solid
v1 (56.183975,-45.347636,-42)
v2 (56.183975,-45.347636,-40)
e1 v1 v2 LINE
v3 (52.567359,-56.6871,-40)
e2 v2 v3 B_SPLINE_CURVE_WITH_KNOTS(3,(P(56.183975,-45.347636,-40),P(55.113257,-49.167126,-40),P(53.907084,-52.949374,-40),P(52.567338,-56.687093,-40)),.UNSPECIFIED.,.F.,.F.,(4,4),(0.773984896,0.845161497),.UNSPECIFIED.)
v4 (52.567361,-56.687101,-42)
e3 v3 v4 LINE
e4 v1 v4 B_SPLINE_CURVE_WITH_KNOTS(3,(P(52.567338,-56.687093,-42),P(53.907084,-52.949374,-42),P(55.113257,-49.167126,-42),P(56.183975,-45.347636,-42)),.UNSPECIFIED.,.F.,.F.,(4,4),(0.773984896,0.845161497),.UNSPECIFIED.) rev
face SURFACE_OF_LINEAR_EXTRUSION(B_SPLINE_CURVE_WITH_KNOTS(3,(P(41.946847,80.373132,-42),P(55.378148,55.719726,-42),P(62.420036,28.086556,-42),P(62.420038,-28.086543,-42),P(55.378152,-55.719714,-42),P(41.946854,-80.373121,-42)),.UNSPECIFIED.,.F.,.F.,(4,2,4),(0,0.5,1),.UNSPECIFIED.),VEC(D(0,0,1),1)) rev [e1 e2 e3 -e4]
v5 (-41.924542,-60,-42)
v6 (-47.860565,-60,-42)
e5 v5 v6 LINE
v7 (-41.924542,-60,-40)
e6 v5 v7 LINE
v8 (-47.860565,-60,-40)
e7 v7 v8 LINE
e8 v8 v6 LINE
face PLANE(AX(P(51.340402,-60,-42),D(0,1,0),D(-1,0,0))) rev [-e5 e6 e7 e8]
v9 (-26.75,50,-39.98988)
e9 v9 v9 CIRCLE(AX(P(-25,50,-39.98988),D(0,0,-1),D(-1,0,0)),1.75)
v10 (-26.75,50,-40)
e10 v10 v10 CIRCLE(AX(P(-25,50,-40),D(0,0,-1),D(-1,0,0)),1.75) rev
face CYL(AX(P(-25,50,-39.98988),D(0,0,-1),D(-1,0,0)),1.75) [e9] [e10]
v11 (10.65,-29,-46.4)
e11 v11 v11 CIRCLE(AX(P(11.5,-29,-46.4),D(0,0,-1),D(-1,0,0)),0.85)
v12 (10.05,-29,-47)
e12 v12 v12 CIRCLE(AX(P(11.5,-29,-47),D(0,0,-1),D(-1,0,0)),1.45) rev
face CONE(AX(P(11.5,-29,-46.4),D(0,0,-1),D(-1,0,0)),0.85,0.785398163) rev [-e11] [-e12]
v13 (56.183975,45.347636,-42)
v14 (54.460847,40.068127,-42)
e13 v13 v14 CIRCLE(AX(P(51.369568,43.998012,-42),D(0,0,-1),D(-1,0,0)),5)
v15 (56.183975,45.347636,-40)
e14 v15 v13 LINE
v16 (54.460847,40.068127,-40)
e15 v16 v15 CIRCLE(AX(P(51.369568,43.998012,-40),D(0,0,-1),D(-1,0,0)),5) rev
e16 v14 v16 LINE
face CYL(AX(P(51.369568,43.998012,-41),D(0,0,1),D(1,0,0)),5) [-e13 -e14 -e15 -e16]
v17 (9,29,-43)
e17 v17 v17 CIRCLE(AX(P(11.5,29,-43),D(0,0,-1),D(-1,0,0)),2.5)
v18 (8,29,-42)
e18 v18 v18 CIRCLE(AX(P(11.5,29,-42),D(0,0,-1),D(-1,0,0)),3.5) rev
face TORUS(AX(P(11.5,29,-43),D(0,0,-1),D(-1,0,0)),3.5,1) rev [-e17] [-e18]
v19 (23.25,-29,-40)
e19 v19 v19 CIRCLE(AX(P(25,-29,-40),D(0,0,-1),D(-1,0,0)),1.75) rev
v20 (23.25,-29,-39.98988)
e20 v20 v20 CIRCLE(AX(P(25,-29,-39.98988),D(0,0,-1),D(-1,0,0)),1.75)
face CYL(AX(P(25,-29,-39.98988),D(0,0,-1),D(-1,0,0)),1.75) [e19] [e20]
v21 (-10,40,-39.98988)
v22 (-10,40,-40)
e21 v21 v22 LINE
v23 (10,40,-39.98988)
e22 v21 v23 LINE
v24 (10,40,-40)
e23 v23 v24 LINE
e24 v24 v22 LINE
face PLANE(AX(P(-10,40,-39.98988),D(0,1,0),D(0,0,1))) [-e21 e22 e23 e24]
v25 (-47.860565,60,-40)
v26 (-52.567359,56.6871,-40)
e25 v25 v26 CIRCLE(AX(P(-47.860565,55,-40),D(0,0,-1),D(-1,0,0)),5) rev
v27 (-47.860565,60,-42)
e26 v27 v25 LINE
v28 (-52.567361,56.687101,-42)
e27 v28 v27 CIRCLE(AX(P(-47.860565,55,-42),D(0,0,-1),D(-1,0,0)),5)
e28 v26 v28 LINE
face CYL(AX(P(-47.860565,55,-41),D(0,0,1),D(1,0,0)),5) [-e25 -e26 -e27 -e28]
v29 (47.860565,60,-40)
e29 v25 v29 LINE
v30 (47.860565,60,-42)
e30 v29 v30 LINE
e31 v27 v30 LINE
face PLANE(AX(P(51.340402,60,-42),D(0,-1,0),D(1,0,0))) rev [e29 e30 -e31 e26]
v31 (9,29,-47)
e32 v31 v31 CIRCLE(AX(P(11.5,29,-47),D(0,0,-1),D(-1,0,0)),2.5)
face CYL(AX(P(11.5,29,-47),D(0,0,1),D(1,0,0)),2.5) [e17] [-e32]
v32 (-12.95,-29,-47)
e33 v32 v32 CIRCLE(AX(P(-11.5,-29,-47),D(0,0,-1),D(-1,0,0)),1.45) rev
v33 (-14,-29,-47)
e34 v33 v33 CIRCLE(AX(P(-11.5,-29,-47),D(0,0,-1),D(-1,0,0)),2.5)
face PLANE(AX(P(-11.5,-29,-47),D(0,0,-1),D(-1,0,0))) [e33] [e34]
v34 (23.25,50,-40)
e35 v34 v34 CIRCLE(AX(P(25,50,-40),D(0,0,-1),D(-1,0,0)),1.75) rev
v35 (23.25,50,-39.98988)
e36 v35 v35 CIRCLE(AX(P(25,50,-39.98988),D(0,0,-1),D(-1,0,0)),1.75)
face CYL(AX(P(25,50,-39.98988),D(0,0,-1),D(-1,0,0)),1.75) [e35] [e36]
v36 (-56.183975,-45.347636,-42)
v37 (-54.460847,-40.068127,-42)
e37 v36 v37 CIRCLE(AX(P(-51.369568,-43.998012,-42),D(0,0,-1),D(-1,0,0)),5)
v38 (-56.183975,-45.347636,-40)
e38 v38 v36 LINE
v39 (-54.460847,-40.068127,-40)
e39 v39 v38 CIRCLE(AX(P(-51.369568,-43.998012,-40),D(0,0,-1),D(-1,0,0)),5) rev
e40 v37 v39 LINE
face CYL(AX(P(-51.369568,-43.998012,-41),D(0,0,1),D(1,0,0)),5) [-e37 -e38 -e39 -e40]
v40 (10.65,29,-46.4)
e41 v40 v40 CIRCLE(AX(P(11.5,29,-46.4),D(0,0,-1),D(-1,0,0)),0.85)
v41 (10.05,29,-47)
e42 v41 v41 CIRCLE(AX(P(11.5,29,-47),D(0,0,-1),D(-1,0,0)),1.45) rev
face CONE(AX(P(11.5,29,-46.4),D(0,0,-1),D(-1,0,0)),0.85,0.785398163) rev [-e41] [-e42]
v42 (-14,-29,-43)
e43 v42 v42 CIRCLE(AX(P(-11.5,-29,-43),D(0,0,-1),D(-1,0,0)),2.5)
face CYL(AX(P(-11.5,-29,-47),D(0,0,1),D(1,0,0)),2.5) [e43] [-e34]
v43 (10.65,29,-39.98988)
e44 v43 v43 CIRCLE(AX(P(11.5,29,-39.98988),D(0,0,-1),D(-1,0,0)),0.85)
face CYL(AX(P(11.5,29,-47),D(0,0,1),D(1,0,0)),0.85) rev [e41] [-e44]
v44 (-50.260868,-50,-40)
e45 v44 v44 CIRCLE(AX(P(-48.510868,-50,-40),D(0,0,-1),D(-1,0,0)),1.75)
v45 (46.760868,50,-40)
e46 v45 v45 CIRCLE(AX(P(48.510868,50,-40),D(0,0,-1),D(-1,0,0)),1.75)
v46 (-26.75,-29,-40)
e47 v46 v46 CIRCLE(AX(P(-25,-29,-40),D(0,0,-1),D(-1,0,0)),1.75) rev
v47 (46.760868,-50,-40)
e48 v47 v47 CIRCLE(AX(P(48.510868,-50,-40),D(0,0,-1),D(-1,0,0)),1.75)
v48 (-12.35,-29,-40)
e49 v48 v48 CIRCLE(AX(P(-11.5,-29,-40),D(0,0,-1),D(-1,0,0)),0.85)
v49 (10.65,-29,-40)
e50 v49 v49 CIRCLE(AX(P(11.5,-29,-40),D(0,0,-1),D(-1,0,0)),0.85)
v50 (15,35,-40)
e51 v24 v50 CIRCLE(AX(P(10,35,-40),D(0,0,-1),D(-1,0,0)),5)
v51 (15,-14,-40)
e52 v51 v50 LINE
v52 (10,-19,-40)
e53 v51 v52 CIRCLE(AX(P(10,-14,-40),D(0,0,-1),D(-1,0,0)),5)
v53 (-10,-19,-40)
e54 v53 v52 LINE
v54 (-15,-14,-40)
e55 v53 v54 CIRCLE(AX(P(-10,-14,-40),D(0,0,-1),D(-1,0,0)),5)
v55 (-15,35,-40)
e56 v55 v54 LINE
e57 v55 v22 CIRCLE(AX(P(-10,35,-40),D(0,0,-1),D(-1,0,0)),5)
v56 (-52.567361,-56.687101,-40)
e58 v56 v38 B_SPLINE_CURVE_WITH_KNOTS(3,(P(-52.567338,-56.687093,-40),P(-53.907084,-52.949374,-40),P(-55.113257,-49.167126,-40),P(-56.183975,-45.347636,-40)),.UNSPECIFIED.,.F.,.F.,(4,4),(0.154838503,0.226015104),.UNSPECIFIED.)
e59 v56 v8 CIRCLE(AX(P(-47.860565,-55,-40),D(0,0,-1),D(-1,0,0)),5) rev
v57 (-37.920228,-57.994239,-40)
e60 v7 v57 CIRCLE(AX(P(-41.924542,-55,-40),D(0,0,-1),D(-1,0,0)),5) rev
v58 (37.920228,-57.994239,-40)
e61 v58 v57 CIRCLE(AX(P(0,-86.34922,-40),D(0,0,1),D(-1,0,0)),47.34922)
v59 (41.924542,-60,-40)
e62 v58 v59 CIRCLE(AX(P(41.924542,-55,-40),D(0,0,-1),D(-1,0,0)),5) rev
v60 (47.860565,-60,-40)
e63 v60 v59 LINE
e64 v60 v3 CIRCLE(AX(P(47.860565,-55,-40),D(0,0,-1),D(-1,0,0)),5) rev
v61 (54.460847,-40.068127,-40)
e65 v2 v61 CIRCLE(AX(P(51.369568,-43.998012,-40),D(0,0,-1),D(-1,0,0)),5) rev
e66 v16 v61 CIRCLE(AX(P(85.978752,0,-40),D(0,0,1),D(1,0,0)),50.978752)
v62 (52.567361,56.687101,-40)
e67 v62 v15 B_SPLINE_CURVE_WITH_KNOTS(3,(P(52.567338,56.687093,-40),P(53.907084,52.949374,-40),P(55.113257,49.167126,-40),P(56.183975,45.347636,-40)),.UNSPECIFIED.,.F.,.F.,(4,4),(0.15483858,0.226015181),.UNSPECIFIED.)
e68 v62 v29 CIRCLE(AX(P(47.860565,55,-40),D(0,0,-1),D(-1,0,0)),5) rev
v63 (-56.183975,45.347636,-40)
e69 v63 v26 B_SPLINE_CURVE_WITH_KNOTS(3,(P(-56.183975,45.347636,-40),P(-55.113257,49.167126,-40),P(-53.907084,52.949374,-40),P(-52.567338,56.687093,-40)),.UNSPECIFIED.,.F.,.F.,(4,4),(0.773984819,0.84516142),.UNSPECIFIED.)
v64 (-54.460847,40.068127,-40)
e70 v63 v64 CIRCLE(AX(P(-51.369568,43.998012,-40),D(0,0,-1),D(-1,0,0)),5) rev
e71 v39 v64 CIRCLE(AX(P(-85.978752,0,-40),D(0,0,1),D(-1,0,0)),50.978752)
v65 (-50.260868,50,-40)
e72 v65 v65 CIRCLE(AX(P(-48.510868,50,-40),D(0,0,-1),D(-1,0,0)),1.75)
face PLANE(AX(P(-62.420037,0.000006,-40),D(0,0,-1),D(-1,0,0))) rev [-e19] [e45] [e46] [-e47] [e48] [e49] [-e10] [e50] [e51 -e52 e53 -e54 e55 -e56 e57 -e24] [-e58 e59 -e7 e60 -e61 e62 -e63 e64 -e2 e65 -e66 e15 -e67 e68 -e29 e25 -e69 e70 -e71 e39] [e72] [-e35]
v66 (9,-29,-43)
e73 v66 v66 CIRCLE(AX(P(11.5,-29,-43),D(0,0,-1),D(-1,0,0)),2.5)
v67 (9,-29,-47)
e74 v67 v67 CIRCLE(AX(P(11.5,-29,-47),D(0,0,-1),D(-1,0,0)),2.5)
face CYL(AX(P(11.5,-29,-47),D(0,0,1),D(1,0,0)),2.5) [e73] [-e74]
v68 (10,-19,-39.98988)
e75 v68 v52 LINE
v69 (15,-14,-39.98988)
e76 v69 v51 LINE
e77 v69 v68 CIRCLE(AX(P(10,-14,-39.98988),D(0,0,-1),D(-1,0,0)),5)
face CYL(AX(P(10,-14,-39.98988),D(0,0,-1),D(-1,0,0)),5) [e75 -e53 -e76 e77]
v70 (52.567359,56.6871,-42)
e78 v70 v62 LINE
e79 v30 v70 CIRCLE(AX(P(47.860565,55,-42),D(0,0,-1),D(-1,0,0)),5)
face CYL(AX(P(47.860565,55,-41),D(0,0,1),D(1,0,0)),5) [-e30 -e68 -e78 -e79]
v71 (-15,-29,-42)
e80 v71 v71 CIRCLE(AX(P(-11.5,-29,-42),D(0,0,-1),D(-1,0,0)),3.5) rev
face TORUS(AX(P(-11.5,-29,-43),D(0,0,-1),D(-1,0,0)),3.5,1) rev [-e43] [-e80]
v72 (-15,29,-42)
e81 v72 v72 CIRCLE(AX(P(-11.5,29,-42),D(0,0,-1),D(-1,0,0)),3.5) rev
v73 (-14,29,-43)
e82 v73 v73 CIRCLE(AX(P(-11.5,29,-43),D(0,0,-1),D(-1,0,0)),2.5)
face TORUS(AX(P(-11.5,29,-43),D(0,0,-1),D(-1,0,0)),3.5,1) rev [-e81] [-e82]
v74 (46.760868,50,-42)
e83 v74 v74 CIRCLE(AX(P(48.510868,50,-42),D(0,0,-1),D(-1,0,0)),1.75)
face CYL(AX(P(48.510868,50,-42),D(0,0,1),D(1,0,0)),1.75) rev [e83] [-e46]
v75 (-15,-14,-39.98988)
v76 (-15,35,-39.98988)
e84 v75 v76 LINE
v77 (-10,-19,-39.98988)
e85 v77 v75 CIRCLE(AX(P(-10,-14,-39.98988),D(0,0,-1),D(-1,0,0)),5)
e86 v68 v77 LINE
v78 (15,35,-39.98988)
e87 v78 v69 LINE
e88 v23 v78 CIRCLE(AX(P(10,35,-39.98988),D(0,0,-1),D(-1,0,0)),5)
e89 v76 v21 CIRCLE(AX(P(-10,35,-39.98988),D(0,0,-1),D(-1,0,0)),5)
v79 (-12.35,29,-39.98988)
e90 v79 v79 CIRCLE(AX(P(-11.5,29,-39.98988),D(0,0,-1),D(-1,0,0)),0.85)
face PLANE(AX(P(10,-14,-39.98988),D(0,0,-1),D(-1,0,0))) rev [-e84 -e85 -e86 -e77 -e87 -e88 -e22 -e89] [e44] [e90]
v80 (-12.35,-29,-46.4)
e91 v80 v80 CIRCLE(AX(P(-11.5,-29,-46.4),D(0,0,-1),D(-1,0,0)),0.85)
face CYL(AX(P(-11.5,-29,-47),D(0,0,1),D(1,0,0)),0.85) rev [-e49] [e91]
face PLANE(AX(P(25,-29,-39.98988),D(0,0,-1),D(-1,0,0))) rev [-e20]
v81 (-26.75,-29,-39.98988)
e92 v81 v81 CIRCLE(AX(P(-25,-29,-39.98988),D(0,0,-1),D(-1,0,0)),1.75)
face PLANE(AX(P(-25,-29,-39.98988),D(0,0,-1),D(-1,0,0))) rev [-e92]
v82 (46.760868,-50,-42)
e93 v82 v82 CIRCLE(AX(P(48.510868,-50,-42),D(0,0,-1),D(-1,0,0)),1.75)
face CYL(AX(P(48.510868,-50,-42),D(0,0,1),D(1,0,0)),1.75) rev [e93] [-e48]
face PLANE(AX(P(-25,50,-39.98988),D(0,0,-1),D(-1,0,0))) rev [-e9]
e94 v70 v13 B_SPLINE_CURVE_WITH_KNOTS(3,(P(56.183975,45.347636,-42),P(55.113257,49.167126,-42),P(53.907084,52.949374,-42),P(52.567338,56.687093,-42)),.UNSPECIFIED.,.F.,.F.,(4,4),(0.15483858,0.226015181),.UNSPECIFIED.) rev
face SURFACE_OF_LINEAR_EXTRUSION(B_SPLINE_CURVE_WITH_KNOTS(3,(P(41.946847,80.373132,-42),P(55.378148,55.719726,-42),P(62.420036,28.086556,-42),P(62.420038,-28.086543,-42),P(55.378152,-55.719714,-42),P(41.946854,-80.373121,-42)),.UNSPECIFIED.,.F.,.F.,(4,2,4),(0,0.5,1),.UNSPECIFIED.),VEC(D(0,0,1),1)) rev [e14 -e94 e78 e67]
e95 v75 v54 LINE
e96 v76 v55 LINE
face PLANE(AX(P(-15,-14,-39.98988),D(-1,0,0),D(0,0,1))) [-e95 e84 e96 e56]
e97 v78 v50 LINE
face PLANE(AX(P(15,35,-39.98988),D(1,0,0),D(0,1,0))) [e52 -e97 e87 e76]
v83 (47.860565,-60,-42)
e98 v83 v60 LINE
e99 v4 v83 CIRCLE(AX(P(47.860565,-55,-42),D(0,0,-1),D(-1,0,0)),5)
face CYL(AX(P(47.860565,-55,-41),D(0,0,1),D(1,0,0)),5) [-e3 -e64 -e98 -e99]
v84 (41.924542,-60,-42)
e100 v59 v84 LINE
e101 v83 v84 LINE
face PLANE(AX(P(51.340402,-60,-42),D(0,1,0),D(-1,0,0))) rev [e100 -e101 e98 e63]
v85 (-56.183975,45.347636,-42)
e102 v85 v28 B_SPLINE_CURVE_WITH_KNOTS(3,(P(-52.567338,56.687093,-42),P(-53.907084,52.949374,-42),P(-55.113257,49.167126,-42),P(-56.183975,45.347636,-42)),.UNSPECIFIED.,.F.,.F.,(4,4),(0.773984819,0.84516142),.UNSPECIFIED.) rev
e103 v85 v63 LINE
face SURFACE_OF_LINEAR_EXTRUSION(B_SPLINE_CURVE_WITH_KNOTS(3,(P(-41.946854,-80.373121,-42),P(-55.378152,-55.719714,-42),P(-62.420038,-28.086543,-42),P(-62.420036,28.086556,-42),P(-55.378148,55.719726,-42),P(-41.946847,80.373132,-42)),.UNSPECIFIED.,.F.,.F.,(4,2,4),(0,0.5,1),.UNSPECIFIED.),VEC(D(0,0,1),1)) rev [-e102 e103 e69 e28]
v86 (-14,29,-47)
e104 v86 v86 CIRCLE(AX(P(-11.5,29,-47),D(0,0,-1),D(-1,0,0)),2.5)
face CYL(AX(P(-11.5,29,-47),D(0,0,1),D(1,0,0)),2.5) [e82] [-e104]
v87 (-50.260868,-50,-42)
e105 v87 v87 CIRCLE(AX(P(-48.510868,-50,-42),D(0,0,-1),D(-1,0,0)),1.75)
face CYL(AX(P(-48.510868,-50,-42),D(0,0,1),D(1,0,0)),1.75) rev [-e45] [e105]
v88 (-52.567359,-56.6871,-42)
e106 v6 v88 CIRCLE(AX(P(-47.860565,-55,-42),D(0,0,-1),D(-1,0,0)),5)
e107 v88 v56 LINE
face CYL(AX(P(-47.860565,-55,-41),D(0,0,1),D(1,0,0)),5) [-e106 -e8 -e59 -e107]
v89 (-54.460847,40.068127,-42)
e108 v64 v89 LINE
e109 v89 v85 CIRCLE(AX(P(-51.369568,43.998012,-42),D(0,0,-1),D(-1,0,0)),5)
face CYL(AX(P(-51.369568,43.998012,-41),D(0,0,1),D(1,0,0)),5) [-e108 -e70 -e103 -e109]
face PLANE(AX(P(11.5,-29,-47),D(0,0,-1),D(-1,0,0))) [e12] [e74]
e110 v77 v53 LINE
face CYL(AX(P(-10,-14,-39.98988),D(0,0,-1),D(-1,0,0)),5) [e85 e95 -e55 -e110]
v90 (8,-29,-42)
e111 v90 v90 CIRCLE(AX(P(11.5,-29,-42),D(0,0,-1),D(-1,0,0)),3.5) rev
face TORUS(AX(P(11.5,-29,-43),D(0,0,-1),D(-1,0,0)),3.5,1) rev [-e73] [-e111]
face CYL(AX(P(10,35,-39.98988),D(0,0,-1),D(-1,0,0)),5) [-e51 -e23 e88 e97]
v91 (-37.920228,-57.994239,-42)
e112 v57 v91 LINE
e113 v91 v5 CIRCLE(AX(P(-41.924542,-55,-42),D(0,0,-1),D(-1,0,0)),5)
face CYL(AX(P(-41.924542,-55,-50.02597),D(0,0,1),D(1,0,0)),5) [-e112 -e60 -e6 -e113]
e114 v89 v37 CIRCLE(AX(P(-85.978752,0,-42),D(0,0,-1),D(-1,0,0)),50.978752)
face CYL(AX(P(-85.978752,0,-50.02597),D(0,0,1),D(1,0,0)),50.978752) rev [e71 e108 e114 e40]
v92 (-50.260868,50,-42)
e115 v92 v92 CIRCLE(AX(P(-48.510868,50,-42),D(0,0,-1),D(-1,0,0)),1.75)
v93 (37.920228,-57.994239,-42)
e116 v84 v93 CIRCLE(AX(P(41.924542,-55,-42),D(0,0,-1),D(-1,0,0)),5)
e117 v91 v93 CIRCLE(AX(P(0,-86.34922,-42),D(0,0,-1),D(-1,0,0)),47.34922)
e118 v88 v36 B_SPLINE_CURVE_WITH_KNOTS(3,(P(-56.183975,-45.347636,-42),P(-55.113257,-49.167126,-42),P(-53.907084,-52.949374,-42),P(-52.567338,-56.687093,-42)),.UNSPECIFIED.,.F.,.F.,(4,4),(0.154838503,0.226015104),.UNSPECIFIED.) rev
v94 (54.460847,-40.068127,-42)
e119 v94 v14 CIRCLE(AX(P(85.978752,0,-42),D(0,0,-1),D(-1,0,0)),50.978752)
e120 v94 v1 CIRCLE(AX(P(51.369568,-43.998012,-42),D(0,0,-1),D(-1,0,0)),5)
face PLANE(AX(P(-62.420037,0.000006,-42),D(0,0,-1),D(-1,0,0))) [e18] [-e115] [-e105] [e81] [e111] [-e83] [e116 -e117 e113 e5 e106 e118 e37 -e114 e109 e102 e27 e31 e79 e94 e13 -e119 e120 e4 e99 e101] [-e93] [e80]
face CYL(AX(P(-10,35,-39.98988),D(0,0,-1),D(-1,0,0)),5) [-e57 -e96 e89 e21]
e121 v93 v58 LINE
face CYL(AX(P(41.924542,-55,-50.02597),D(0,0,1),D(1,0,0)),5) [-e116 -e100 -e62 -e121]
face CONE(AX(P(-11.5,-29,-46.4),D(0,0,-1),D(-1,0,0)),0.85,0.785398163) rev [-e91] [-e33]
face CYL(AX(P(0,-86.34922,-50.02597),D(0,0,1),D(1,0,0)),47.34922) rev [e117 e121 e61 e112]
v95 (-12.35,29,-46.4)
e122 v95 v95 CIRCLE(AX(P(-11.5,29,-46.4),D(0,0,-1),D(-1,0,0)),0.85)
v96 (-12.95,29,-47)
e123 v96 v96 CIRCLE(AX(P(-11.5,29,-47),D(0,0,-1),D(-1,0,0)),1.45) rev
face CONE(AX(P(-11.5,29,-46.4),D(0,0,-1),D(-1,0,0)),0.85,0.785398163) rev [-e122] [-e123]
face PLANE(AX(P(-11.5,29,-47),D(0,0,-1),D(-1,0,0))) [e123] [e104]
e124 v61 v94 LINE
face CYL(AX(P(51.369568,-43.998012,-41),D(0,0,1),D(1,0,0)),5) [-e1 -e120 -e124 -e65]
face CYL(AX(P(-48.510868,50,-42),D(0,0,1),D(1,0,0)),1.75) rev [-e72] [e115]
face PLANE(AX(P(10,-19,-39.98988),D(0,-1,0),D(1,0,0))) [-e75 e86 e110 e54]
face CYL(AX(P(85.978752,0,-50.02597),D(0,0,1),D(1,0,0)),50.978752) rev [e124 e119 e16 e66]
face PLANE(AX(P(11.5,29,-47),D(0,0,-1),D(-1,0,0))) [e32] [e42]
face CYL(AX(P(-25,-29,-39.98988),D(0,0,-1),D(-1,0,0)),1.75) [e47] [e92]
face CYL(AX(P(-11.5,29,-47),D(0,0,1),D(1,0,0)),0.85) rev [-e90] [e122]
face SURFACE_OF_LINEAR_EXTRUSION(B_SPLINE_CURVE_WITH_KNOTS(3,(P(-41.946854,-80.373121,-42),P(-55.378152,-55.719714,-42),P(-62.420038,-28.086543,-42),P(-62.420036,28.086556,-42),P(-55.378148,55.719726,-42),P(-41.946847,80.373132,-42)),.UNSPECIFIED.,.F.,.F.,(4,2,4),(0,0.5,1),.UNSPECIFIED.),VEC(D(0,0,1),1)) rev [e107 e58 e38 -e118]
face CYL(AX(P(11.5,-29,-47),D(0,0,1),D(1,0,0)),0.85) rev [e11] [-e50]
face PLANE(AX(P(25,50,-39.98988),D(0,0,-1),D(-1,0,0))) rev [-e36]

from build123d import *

# Parameters (mm, degrees)
IMPORTED_START                     = -42
IMPORTED_BODY_1_OUTLINE_R          = 1.75
IMPORTED_BODY_1_DEPTH              = 2
EXTRUDE_START                      = -2.01012
SKETCH_1_R                         = 1.75
EXTRUDE_1_DEPTH                    = 2.01012
SKETCH_2_R                         = 2.5
SKETCH_2_R_2                       = 0.85
EXTRUDE_2_DEPTH                    = 5
FILLET_1_R                         = 1
CHAMFER_1_SIZE                     = 0.6
SKETCH_3_R                         = 0.85
CUT_EXTRUDE_1_DEPTH                = 83.477440833
PATTERN_LINEAR_1_COUNT             = 2
PATTERN_LINEAR_1_PITCH             = 58
PATTERN_LINEAR_1_COUNT_DIR2        = 2
PATTERN_LINEAR_1_PITCH_DIR2        = 23
FILLET_1_OF_PATTERN_LINEAR_1_R     = 1
CHAMFER_1_OF_PATTERN_LINEAR_1_SIZE = 0.6


# Read off the part's stored shape, not the designer's step: Заготовка-Основание-1
with BuildPart() as part:
    # Заготовка-Основание-1 outline → Заготовка-Основание-1 (new body)
    with BuildSketch(Plane.XY.offset(IMPORTED_START)):
        with BuildLine():
            add(Edge.make_bspline(
                [(-52.567338158, -56.687092755), (-53.907083637, -52.949373723), (-55.113256729, -49.167125614), (-56.183975236, -45.347636311)],
                knots=[0.154838503, 0.154838503, 0.154838503, 0.154838503, 0.226015104, 0.226015104, 0.226015104, 0.226015104], degree=3))
            ThreePointArc((-52.567338158, -56.687092755), (-50.738457524, -59.088732308), (-47.860564525, -60))
            Line((-47.860564525, -60), (-41.924542191, -60))
            ThreePointArc((-41.924542191, -60), (-39.685256286, -59.470525543), (-37.920228255, -57.994239454))
            ThreePointArc((-37.920228255, -57.994239454), (0, -39), (37.920228255, -57.994239454))
            ThreePointArc((37.920228255, -57.994239454), (39.685256286, -59.470525543), (41.924542191, -60))
            Line((41.924542191, -60), (47.860564525, -60))
            ThreePointArc((47.860564525, -60), (50.738457524, -59.088732308), (52.567338158, -56.687092755))
            add(Edge.make_bspline(
                [(56.183975236, -45.347636311), (55.113256729, -49.167125614), (53.907083637, -52.949373723), (52.567338158, -56.687092755)],
                knots=[0.773984896, 0.773984896, 0.773984896, 0.773984896, 0.845161497, 0.845161497, 0.845161497, 0.845161497], degree=3))
            ThreePointArc((56.183975236, -45.347636311), (56.122806116, -42.446648473), (54.460846844, -40.068127194))
            ThreePointArc((54.460846844, -40.068127194), (35, 6e-09), (54.460846854, 40.068127202))
            ThreePointArc((54.460846854, 40.068127202), (56.122806127, 42.446648481), (56.183975247, 45.34763632))
            add(Edge.make_bspline(
                [(52.567338167, 56.687092757), (53.907083647, 52.949373727), (55.113256739, 49.167125621), (56.183975247, 45.34763632)],
                knots=[0.15483858, 0.15483858, 0.15483858, 0.15483858, 0.226015181, 0.226015181, 0.226015181, 0.226015181], degree=3))
            ThreePointArc((52.567338167, 56.687092757), (50.738457533, 59.088732309), (47.860564535, 60))
            Line((47.860564535, 60), (-47.860564535, 60))
            ThreePointArc((-47.860564535, 60), (-50.738457533, 59.088732309), (-52.567338167, 56.687092757))
            add(Edge.make_bspline(
                [(-56.183975247, 45.34763632), (-55.113256739, 49.167125621), (-53.907083647, 52.949373727), (-52.567338167, 56.687092757)],
                knots=[0.773984819, 0.773984819, 0.773984819, 0.773984819, 0.84516142, 0.84516142, 0.84516142, 0.84516142], degree=3))
            ThreePointArc((-56.183975247, 45.34763632), (-56.122806127, 42.446648481), (-54.460846854, 40.068127202))
            ThreePointArc((-54.460846854, 40.068127202), (-35, 6e-09), (-54.460846844, -40.068127194))
            ThreePointArc((-54.460846844, -40.068127194), (-56.122806116, -42.446648473), (-56.183975236, -45.347636311))
        make_face()
        with Locations((-48.510868396, -50)):
            Circle(IMPORTED_BODY_1_OUTLINE_R, mode=Mode.SUBTRACT)
        with Locations((-25, -29)):
            Circle(IMPORTED_BODY_1_OUTLINE_R, mode=Mode.SUBTRACT)
        with Locations((48.510868396, -50)):
            Circle(IMPORTED_BODY_1_OUTLINE_R, mode=Mode.SUBTRACT)
        with Locations((25, -29)):
            Circle(IMPORTED_BODY_1_OUTLINE_R, mode=Mode.SUBTRACT)
        with Locations((-48.510868396, 50)):
            Circle(IMPORTED_BODY_1_OUTLINE_R, mode=Mode.SUBTRACT)
        with Locations((-25, 50)):
            Circle(IMPORTED_BODY_1_OUTLINE_R, mode=Mode.SUBTRACT)
        with BuildLine():
            Line((-15, -14), (-15, 35))
            ThreePointArc((-15, 35), (-13.535533906, 38.535533906), (-10, 40))
            Line((-10, 40), (10, 40))
            ThreePointArc((10, 40), (13.535533906, 38.535533906), (15, 35))
            Line((15, 35), (15, -14))
            ThreePointArc((15, -14), (13.535533906, -17.535533906), (10, -19))
            Line((10, -19), (-10, -19))
            ThreePointArc((-10, -19), (-13.535533906, -17.535533906), (-15, -14))
        make_face(mode=Mode.SUBTRACT)
        with Locations((25, 50)):
            Circle(IMPORTED_BODY_1_OUTLINE_R, mode=Mode.SUBTRACT)
        with Locations((48.510868396, 50)):
            Circle(IMPORTED_BODY_1_OUTLINE_R, mode=Mode.SUBTRACT)
    extrude(amount=IMPORTED_BODY_1_DEPTH)

    # Эскиз1 → Бобышка-Вытянуть1 (add)
    with BuildSketch(Plane(origin=(0, 0, -42), x_dir=(-1, 0, 0), z_dir=(0, 0, -1)).offset(EXTRUDE_START)):
        with Locations((-25, -29)):
            Circle(SKETCH_1_R)
        with Locations((25, -29)):
            Circle(SKETCH_1_R)
        with Locations((25, 50)):
            Circle(SKETCH_1_R)
        with Locations((-25, 50)):
            Circle(SKETCH_1_R)
        with BuildLine():
            Line((-10, -19), (10, -19))
            ThreePointArc((10, -19), (13.535533906, -17.535533906), (15, -14))
            Line((15, -14), (15, 35))
            ThreePointArc((15, 35), (13.535533906, 38.535533906), (10, 40))
            Line((10, 40), (-10, 40))
            ThreePointArc((-10, 40), (-13.535533906, 38.535533906), (-15, 35))
            Line((-15, 35), (-15, -14))
            ThreePointArc((-15, -14), (-13.535533906, -17.535533906), (-10, -19))
        make_face()
    extrude(amount=EXTRUDE_1_DEPTH)

    # Эскиз2 → Бобышка-Вытянуть2 (add)
    with BuildSketch(Plane(origin=(0, 0, -42), x_dir=(-1, 0, 0), z_dir=(0, 0, -1))):
        with Locations((-11.5, 29)):
            Circle(SKETCH_2_R)
        with Locations((-11.5, 29)):
            Circle(SKETCH_2_R_2, mode=Mode.SUBTRACT)
    extrude_2 = extrude(amount=EXTRUDE_2_DEPTH)

    # Скругление1
    fillet_1_edges = [part.edges().sort_by_distance(p)[0] for p in [
        (14, 29, -42),
    ]]
    fillet(fillet_1_edges, radius=FILLET_1_R)

    # Фаска1
    chamfer_1_edges = [part.edges().sort_by_distance(p)[0] for p in [
        (12.35, 29, -47),
    ]]
    chamfer(chamfer_1_edges, length=CHAMFER_1_SIZE)

    # Эскиз3 → Вырез-Вытянуть1 (cut, through all)
    with BuildSketch(Plane(origin=(0, 0, -42), x_dir=(-1, 0, 0), z_dir=(0, 0, -1))):
        with Locations((-11.5, 29)):
            Circle(SKETCH_3_R)
    cut_extrude_1 = extrude(amount=-CUT_EXTRUDE_1_DEPTH, mode=Mode.SUBTRACT)

    # Линейный массив1: Бобышка-Вытянуть2, Cut-Extrude 1 2 × 2
    with Locations(*[(-j * PATTERN_LINEAR_1_PITCH_DIR2, -i * PATTERN_LINEAR_1_PITCH, 0) for i in range(PATTERN_LINEAR_1_COUNT) for j in range(PATTERN_LINEAR_1_COUNT_DIR2) if (i, j) != (0, 0)]):
        add(extrude_2)
        add(cut_extrude_1, mode=Mode.SUBTRACT)

    # Скругление1 of Линейный массив1
    fillet_1_of_pattern_linear_1_edges = [part.edges().sort_by_distance(p)[0] for p in [
        (-9, 29, -42),
        (14, -29, -42),
        (-9, -29, -42),
    ]]
    fillet(fillet_1_of_pattern_linear_1_edges, radius=FILLET_1_OF_PATTERN_LINEAR_1_R)

    # Фаска1 of Линейный массив1
    chamfer_1_of_pattern_linear_1_edges = [part.edges().sort_by_distance(p)[0] for p in [
        (-10.65, 29, -47),
        (12.35, -29, -47),
        (-10.65, -29, -47),
    ]]
    chamfer(chamfer_1_of_pattern_linear_1_edges, length=CHAMFER_1_OF_PATTERN_LINEAR_1_SIZE)


solid = part.part
